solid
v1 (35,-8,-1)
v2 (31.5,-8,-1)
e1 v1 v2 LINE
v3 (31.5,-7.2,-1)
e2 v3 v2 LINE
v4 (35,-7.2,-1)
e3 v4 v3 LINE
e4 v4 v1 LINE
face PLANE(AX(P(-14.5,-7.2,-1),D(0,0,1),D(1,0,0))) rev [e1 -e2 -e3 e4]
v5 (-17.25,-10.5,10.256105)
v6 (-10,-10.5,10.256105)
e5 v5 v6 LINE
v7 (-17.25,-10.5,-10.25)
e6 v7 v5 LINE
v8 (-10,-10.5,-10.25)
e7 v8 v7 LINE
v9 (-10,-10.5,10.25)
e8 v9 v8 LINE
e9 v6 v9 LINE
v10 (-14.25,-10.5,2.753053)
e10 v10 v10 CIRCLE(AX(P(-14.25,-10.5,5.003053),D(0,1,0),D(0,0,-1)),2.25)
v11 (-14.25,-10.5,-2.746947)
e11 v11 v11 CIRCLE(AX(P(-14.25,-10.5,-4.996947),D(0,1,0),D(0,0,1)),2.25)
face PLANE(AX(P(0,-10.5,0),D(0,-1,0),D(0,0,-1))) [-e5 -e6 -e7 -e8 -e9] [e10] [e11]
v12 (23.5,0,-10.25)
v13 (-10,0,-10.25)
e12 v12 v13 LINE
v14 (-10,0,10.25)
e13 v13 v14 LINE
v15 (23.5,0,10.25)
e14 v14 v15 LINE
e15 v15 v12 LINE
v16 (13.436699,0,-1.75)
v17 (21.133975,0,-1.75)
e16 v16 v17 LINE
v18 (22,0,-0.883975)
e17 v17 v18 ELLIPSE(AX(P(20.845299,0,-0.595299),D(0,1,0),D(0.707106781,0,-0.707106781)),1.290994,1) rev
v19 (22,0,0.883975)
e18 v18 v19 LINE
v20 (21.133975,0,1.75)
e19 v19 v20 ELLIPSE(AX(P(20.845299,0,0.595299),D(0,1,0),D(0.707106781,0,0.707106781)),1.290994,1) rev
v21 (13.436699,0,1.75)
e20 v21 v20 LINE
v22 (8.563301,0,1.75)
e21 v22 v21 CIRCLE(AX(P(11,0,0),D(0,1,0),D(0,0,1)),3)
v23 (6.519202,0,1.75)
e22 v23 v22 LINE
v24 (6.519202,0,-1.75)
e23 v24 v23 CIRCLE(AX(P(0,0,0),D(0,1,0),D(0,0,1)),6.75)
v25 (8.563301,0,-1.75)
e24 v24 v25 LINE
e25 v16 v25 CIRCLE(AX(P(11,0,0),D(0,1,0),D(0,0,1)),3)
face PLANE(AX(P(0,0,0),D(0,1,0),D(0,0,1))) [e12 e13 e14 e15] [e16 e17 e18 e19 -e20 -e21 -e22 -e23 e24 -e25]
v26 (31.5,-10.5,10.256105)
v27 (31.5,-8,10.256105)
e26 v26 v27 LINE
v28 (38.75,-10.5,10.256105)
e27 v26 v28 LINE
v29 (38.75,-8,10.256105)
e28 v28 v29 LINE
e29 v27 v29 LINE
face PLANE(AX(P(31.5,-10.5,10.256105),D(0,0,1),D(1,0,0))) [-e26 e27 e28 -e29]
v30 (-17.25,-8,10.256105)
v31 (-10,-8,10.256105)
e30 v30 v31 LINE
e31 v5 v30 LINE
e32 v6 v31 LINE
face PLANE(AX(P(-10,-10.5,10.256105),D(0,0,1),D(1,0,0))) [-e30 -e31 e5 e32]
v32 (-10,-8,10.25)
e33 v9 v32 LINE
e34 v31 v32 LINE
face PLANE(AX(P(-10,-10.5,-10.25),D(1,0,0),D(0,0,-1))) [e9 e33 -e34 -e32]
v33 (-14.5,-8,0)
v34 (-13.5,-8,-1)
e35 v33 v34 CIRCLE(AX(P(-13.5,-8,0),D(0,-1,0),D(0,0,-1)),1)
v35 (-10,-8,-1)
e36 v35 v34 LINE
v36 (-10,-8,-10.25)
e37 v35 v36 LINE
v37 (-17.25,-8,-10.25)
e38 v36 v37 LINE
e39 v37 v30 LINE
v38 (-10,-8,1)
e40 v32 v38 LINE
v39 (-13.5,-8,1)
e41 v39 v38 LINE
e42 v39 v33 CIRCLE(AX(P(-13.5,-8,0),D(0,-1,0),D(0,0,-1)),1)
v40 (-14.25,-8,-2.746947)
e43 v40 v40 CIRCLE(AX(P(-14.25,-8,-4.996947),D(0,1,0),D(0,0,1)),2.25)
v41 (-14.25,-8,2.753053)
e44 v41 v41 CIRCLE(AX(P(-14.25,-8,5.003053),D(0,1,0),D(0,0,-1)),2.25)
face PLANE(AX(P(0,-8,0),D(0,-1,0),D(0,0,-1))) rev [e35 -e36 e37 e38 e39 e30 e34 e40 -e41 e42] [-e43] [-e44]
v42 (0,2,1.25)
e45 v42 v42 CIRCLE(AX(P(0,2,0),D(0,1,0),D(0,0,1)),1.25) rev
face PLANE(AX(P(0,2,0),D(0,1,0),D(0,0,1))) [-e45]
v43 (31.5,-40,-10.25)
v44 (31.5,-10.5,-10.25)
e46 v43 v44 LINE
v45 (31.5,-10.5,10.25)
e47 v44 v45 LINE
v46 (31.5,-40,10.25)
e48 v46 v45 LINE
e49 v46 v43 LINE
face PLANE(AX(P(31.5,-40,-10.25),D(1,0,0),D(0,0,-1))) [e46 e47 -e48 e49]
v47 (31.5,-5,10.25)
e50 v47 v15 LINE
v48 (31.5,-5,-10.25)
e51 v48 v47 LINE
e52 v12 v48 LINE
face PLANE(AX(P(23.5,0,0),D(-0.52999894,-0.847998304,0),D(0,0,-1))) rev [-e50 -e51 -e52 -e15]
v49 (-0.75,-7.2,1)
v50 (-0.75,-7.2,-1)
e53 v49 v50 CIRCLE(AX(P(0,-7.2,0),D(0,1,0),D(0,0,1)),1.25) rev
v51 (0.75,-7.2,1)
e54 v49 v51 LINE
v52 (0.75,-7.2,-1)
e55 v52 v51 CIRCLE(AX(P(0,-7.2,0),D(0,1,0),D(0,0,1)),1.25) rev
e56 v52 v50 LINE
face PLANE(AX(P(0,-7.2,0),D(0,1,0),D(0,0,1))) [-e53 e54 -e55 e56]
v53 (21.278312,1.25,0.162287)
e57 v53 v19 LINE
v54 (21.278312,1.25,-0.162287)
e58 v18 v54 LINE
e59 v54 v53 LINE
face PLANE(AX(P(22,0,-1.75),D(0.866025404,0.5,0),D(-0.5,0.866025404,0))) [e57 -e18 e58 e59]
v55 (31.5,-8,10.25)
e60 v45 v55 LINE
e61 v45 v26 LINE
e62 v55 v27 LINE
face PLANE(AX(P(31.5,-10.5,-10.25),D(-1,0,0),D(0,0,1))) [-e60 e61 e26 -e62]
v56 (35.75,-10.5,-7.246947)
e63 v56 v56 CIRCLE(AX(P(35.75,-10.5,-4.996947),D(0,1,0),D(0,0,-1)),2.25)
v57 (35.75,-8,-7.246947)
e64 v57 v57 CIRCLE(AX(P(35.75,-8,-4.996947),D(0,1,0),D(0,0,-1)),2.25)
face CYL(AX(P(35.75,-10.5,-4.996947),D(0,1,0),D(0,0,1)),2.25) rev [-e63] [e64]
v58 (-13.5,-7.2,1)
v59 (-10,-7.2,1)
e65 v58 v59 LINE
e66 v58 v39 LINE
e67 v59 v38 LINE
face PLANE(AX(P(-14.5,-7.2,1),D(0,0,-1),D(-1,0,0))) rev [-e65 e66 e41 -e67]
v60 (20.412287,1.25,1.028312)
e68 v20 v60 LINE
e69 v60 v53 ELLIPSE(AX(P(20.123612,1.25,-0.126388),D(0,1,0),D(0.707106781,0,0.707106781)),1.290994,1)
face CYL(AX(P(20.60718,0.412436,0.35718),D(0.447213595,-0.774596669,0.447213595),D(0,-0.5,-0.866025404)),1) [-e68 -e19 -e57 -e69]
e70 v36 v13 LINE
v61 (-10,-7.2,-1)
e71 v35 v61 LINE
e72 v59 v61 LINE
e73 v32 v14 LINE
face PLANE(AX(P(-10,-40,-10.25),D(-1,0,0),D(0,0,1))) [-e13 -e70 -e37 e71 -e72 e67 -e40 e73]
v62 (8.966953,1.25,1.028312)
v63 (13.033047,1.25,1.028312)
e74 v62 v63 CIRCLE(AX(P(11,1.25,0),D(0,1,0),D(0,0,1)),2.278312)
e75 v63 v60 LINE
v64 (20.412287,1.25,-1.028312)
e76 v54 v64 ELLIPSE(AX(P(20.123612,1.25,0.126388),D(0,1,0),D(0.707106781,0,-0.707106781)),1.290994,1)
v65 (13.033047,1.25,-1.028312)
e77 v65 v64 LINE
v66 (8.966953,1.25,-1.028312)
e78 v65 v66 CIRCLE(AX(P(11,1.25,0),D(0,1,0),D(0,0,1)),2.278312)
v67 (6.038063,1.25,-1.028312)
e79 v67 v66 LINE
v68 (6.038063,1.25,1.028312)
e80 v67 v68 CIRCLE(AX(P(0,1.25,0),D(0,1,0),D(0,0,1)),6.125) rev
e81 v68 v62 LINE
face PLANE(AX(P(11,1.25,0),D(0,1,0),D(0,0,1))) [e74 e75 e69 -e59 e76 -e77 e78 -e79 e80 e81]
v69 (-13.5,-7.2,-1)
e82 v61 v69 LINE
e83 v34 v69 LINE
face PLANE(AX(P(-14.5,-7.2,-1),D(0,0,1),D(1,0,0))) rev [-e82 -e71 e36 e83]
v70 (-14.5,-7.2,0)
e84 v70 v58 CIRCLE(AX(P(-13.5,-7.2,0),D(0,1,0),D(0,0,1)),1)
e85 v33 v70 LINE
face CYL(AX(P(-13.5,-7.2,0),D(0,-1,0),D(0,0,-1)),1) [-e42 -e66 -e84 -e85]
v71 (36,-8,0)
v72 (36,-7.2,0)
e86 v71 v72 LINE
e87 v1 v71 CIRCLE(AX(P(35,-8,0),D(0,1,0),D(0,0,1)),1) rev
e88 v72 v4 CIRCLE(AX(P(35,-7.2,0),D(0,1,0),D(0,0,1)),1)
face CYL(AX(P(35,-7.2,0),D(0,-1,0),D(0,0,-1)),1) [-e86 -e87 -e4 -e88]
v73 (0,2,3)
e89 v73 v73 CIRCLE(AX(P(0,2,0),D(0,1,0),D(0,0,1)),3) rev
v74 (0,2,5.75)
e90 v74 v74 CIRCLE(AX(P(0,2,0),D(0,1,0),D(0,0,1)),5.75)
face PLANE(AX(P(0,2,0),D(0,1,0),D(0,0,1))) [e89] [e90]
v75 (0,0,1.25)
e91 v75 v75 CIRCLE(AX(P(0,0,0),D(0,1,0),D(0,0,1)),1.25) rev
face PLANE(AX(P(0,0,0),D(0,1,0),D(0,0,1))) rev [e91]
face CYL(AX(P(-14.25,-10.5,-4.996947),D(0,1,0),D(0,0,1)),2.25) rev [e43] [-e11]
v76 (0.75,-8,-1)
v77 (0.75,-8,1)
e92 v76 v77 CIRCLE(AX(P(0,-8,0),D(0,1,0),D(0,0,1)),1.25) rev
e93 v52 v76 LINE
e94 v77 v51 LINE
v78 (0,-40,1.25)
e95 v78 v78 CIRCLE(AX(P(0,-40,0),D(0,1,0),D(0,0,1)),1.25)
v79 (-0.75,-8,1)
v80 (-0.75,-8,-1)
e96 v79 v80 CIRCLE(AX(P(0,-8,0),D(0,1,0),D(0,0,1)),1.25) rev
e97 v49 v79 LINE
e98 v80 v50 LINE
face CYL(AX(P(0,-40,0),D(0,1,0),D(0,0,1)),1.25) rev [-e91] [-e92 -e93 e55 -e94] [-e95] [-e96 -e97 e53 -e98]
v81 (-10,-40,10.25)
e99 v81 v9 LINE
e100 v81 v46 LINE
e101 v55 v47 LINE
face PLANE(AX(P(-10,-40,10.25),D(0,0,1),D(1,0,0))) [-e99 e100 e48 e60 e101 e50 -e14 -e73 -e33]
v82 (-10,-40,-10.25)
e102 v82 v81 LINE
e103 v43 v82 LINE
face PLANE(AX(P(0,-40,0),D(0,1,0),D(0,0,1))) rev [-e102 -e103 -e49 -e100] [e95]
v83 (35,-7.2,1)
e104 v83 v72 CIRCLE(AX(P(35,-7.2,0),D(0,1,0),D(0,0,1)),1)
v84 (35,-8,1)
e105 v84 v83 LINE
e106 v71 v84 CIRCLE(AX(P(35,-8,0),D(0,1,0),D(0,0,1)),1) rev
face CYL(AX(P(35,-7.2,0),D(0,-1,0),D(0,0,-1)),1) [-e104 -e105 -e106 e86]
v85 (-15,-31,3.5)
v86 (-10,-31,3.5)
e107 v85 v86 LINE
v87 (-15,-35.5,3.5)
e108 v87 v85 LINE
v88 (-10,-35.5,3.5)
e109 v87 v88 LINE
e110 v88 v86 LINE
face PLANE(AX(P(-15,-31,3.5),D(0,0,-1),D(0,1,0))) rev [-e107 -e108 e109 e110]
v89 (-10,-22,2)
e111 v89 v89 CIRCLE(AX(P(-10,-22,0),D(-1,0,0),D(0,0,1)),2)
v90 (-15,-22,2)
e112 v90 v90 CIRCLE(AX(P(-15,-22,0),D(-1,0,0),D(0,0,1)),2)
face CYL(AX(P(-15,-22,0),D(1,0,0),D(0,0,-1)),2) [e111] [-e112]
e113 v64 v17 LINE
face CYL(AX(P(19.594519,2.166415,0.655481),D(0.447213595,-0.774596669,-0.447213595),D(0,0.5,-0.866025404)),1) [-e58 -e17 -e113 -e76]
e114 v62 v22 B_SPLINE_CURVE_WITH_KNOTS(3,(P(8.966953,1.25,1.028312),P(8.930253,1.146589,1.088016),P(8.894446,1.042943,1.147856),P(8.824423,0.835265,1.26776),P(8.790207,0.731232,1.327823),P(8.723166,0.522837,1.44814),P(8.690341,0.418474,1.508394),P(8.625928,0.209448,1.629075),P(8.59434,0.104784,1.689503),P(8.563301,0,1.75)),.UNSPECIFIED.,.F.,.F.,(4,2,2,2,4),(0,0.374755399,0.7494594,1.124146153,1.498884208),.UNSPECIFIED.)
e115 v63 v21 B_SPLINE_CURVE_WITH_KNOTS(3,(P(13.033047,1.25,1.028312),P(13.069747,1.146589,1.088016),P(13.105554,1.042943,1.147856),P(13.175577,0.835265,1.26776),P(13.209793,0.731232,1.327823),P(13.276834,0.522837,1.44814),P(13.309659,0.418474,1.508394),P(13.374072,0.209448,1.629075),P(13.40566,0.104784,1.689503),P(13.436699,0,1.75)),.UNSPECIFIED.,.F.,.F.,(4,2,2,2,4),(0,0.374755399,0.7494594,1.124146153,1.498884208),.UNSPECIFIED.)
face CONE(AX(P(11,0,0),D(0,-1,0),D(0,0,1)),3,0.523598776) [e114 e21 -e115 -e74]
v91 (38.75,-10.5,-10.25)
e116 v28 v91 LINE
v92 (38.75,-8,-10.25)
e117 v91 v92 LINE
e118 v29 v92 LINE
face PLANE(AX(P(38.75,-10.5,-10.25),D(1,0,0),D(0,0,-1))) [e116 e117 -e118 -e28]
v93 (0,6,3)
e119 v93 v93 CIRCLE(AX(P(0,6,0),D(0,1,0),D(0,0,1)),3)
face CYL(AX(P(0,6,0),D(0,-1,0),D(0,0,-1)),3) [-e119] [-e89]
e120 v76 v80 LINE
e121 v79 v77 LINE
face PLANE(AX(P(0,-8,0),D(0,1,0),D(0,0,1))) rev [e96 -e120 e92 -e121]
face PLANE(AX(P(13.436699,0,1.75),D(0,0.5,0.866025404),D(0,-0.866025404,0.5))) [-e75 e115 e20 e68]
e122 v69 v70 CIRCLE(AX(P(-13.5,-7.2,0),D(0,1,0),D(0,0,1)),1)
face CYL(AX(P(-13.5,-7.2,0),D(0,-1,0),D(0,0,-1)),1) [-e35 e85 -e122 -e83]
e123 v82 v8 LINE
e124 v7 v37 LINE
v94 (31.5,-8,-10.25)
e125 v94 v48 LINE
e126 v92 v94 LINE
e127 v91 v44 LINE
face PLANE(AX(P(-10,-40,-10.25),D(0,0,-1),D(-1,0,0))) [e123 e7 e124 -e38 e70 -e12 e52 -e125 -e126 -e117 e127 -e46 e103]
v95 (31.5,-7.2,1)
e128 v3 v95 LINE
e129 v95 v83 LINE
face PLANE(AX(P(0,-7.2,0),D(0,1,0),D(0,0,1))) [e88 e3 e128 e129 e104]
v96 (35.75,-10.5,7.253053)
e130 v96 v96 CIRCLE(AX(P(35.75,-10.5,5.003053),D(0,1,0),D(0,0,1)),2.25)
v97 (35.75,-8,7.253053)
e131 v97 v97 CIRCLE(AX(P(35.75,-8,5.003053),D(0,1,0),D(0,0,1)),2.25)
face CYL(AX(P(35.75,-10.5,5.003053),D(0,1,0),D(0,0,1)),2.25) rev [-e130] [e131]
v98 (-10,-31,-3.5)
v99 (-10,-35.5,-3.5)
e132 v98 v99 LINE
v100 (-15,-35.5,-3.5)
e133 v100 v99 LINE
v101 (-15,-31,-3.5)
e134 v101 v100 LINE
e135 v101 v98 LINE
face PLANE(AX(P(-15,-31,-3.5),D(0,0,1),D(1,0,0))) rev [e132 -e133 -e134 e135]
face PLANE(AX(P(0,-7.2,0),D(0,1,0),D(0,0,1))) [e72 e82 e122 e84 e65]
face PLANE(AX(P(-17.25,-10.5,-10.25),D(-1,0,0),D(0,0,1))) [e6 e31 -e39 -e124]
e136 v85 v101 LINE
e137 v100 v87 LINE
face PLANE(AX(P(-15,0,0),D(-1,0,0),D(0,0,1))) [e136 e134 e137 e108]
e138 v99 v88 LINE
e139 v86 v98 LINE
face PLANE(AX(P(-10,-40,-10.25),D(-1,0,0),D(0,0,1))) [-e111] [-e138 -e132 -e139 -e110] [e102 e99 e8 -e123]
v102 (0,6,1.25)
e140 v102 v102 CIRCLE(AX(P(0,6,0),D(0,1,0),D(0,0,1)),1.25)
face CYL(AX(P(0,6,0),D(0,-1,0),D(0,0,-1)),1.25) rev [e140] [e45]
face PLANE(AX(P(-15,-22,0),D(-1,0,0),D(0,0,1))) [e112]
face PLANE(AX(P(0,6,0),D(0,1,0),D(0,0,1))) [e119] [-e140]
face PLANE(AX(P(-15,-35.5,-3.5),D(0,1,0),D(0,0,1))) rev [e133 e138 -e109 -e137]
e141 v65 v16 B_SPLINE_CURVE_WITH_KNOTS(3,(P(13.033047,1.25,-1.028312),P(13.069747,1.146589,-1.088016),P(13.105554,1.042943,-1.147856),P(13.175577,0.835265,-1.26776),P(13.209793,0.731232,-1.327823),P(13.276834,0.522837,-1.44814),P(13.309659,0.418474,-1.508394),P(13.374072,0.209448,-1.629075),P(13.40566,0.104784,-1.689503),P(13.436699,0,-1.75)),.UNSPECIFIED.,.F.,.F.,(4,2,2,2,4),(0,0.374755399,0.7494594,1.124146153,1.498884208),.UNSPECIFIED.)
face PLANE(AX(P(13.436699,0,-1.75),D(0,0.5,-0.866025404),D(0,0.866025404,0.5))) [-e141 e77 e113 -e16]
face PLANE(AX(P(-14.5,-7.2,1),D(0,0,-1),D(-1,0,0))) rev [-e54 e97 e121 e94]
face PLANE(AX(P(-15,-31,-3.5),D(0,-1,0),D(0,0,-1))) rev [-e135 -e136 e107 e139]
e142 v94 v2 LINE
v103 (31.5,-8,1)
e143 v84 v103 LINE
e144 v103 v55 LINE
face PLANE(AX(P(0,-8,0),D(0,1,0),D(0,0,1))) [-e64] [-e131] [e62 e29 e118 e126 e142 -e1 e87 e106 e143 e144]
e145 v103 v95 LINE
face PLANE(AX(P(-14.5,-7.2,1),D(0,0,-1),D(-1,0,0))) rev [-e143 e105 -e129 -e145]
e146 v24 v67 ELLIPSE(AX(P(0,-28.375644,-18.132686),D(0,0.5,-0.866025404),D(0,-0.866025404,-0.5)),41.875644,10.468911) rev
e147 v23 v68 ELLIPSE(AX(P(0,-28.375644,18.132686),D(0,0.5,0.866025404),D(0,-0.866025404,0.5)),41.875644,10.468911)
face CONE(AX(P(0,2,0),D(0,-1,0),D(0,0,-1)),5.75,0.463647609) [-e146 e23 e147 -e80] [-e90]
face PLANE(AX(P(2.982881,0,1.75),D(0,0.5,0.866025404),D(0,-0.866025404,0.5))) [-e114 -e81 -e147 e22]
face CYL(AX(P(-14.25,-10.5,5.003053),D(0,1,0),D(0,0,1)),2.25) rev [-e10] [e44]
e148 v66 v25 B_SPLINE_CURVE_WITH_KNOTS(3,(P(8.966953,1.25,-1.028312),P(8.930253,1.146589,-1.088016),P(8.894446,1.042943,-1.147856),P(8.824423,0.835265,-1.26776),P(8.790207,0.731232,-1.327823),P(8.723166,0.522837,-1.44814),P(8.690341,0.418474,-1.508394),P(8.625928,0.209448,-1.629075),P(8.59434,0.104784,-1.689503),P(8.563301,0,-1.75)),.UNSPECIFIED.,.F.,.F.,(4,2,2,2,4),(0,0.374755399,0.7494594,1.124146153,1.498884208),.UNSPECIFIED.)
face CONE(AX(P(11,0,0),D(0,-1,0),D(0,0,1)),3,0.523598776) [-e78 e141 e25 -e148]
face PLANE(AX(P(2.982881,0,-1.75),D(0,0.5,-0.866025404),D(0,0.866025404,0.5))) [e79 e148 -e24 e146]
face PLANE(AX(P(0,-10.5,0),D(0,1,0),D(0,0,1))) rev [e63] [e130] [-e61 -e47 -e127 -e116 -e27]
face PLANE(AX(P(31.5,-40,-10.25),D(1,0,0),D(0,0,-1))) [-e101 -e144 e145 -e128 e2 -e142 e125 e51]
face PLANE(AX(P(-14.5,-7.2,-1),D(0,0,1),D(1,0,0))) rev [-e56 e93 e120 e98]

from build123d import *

# Parameters (mm, degrees)
SKETCH1_W           = 41.5
SKETCH1_H           = 20.5
SKETCH1_R           = 1.25
BOSS_EXTRUDE1_DEPTH = 40
CHAMFER1_SIZE       = 5
CHAMFER1_SIZE2      = 8
SKETCH2_W           = 7.25
SKETCH2_H           = 20.506105109
SKETCH2_R           = 2.25
BOSS_EXTRUDE2_DEPTH = 2.5
SKETCH3_W           = 50.5
SKETCH3_H           = 2
BOSS_EXTRUDE3_DEPTH = 0.8
FILLET1_R           = 1
SKETCH4_R           = 6.75
BOSS_EXTRUDE4_DEPTH = 2
CHAMFER2_SIZE2      = 1
CHAMFER2_SIZE       = 2
BOSS_EXTRUDE5_DEPTH = 1.25
BOSS_EXTRUDE5_DRAFT = 30
FILLET2_R           = 1
BOSS_EXTRUDE6_START = 6
SKETCH6_R           = 3
SKETCH6_R_2         = 1.25
BOSS_EXTRUDE6_DEPTH = 6
SKETCH7_R           = 2
SKETCH7_W           = 7
SKETCH7_H           = 4.5
BOSS_EXTRUDE7_DEPTH = 5


with BuildPart() as part:
    # Sketch1 → Boss-Extrude1 (new body)
    with BuildSketch(Plane(origin=(0, 0, 0), x_dir=(1, 0, 0), z_dir=(0, 1, 0))):
        with Locations((10.75, 0)):
            Rectangle(SKETCH1_W, SKETCH1_H)
        with Locations(Location((0, 0, 0), (0, 0, 270))):
            Circle(SKETCH1_R, mode=Mode.SUBTRACT)
    extrude(amount=-BOSS_EXTRUDE1_DEPTH)

    # Chamfer1
    chamfer1_edges = [part.edges().sort_by_distance(p)[0] for p in [
        (31.5, 0, 0),
    ]]
    chamfer1_side = [part.faces().sort_by_distance(p)[0] for p in [
        (31.5, -20, 0),
    ]]
    chamfer(chamfer1_edges, length=CHAMFER1_SIZE, length2=CHAMFER1_SIZE2, reference=chamfer1_side[0])

    # Sketch2 → Boss-Extrude2 (add)
    # profile 1 of 2: a face of its own
    with BuildSketch(Plane(origin=(0, -8, 0), x_dir=(1, 0, 0), z_dir=(0, 1, 0))):
        with Locations((-13.625, -0.003052554)):
            Rectangle(SKETCH2_W, SKETCH2_H)
        with Locations(Location((-14.25, 4.996947445, 0), (0, 0, 270))):
            Circle(SKETCH2_R, mode=Mode.SUBTRACT)
        with Locations(Location((-14.25, -5.003052555, 0), (0, 0, 90))):
            Circle(SKETCH2_R, mode=Mode.SUBTRACT)
    # profile 2 of 2: a face of its own
    with BuildSketch(Plane(origin=(0, -8, 0), x_dir=(1, 0, 0), z_dir=(0, 1, 0))):
        with Locations((35.125, -0.003052554)):
            Rectangle(SKETCH2_W, SKETCH2_H)
        with Locations(Location((35.75, 4.996947445, 0), (0, 0, 90))):
            Circle(SKETCH2_R, mode=Mode.SUBTRACT)
        with Locations(Location((35.75, -5.003052555, 0), (0, 0, 270))):
            Circle(SKETCH2_R, mode=Mode.SUBTRACT)
    extrude(amount=-BOSS_EXTRUDE2_DEPTH)

    # Sketch3 → Boss-Extrude3 (add)
    with BuildSketch(Plane(origin=(0, -8, 0), x_dir=(1, 0, 0), z_dir=(0, 1, 0))):
        with Locations((10.75, 0)):
            Rectangle(SKETCH3_W, SKETCH3_H)
    extrude(amount=BOSS_EXTRUDE3_DEPTH)

    # Fillet1
    fillet1_edges = [part.edges().sort_by_distance(p)[0] for p in [
        (36, -7.6, 1),
        (36, -7.6, -1),
        (-14.5, -7.6, -1),
        (-14.5, -7.6, 1),
    ]]
    fillet(fillet1_edges, radius=FILLET1_R - 0.0001)  # a hair under: the kernel refuses the full size

    # Sketch4 → Boss-Extrude4 (add)
    with BuildSketch(Plane(origin=(0, 0, 0), x_dir=(1, 0, 0), z_dir=(0, 1, 0))):
        with Locations(Location((0, 0, 0), (0, 0, 270))):
            Circle(SKETCH4_R)
    extrude(amount=BOSS_EXTRUDE4_DEPTH)

    # Chamfer2
    chamfer2_edges = [part.edges().sort_by_distance(p)[0] for p in [
        (0, 2, -6.75),
    ]]
    chamfer2_side = [part.faces().sort_by_distance(p)[0] for p in [
        (0, 1.98, -6.75),
    ]]
    chamfer(chamfer2_edges, length=CHAMFER2_SIZE - 0.0001, length2=CHAMFER2_SIZE2 - 0.0001, reference=chamfer2_side[0])  # a hair under: the kernel refuses the full size


with BuildPart() as boss_extrude5_tool:
    # Sketch5 → Boss-Extrude5 (with draft: the straight prism first)
    with BuildSketch(Plane(origin=(0, 0, 0), x_dir=(1, 0, 0), z_dir=(0, 1, 0))):
        with BuildLine():
            ThreePointArc((13.436698586, 1.75), (11, 3), (8.563301414, 1.75))
            Line((8.563301414, 1.75), (2.982880946, 1.75))
            Line((2.982880946, 1.75), (2.982880946, -1.75))
            Line((2.982880946, -1.75), (8.563301414, -1.75))
            ThreePointArc((8.563301414, -1.75), (11, -3), (13.436698586, -1.75))
            Line((13.436698586, -1.75), (22, -1.75))
            Line((22, -1.75), (22, 1.75))
            Line((22, 1.75), (13.436698586, 1.75))
        make_face()
    extrude(amount=BOSS_EXTRUDE5_DEPTH)
    # Boss-Extrude5: the draft: its side faces are tilted about the plane it starts from
    boss_extrude5_sides = [boss_extrude5_tool.faces().sort_by_distance(p)[0] for p in [
        (11, 0.625, -3),
        (5.77309118, 0.625, -1.75),
        (2.982880946, 0.625, 0),
        (5.77309118, 0.625, 1.75),
        (11, 0.625, 3),
        (17.718349293, 0.625, 1.75),
        (22, 0.625, 0),
        (17.718349293, 0.625, -1.75),
    ]]
    draft(boss_extrude5_sides, Plane(origin=(0, 0, 0), x_dir=(1, 0, 0), z_dir=(0, 1, 0)), BOSS_EXTRUDE5_DRAFT)


with BuildPart() as part_1:
    add(part.part)

    # Boss-Extrude5: add boss_extrude5_tool
    add(boss_extrude5_tool.part)

    # Fillet2
    fillet2_edges = [part_1.edges().sort_by_distance(p)[0] for p in [
        (21.639156082, 0.625, 1.389156082),
        (21.639156082, 0.625, -1.389156082),
    ]]
    fillet(fillet2_edges, radius=FILLET2_R)

    # Sketch6 → Boss-Extrude6 (add)
    with BuildSketch(Plane(origin=(0, 0, 0), x_dir=(1, 0, 0), z_dir=(0, 1, 0)).offset(BOSS_EXTRUDE6_START)):
        with Locations(Location((0, 0, 0), (0, 0, 270))):
            Circle(SKETCH6_R)
        with Locations(Location((0, 0, 0), (0, 0, 270))):
            Circle(SKETCH6_R_2, mode=Mode.SUBTRACT)
    extrude(amount=-BOSS_EXTRUDE6_DEPTH)

    # Sketch7 → Boss-Extrude7 (add)
    with BuildSketch(Plane.ZY.offset(10)):
        with Locations((0, -22)):
            Circle(SKETCH7_R)
        with Locations((0, -33.25)):
            Rectangle(SKETCH7_W, SKETCH7_H)
    extrude(amount=BOSS_EXTRUDE7_DEPTH)


solid = part_1.part
